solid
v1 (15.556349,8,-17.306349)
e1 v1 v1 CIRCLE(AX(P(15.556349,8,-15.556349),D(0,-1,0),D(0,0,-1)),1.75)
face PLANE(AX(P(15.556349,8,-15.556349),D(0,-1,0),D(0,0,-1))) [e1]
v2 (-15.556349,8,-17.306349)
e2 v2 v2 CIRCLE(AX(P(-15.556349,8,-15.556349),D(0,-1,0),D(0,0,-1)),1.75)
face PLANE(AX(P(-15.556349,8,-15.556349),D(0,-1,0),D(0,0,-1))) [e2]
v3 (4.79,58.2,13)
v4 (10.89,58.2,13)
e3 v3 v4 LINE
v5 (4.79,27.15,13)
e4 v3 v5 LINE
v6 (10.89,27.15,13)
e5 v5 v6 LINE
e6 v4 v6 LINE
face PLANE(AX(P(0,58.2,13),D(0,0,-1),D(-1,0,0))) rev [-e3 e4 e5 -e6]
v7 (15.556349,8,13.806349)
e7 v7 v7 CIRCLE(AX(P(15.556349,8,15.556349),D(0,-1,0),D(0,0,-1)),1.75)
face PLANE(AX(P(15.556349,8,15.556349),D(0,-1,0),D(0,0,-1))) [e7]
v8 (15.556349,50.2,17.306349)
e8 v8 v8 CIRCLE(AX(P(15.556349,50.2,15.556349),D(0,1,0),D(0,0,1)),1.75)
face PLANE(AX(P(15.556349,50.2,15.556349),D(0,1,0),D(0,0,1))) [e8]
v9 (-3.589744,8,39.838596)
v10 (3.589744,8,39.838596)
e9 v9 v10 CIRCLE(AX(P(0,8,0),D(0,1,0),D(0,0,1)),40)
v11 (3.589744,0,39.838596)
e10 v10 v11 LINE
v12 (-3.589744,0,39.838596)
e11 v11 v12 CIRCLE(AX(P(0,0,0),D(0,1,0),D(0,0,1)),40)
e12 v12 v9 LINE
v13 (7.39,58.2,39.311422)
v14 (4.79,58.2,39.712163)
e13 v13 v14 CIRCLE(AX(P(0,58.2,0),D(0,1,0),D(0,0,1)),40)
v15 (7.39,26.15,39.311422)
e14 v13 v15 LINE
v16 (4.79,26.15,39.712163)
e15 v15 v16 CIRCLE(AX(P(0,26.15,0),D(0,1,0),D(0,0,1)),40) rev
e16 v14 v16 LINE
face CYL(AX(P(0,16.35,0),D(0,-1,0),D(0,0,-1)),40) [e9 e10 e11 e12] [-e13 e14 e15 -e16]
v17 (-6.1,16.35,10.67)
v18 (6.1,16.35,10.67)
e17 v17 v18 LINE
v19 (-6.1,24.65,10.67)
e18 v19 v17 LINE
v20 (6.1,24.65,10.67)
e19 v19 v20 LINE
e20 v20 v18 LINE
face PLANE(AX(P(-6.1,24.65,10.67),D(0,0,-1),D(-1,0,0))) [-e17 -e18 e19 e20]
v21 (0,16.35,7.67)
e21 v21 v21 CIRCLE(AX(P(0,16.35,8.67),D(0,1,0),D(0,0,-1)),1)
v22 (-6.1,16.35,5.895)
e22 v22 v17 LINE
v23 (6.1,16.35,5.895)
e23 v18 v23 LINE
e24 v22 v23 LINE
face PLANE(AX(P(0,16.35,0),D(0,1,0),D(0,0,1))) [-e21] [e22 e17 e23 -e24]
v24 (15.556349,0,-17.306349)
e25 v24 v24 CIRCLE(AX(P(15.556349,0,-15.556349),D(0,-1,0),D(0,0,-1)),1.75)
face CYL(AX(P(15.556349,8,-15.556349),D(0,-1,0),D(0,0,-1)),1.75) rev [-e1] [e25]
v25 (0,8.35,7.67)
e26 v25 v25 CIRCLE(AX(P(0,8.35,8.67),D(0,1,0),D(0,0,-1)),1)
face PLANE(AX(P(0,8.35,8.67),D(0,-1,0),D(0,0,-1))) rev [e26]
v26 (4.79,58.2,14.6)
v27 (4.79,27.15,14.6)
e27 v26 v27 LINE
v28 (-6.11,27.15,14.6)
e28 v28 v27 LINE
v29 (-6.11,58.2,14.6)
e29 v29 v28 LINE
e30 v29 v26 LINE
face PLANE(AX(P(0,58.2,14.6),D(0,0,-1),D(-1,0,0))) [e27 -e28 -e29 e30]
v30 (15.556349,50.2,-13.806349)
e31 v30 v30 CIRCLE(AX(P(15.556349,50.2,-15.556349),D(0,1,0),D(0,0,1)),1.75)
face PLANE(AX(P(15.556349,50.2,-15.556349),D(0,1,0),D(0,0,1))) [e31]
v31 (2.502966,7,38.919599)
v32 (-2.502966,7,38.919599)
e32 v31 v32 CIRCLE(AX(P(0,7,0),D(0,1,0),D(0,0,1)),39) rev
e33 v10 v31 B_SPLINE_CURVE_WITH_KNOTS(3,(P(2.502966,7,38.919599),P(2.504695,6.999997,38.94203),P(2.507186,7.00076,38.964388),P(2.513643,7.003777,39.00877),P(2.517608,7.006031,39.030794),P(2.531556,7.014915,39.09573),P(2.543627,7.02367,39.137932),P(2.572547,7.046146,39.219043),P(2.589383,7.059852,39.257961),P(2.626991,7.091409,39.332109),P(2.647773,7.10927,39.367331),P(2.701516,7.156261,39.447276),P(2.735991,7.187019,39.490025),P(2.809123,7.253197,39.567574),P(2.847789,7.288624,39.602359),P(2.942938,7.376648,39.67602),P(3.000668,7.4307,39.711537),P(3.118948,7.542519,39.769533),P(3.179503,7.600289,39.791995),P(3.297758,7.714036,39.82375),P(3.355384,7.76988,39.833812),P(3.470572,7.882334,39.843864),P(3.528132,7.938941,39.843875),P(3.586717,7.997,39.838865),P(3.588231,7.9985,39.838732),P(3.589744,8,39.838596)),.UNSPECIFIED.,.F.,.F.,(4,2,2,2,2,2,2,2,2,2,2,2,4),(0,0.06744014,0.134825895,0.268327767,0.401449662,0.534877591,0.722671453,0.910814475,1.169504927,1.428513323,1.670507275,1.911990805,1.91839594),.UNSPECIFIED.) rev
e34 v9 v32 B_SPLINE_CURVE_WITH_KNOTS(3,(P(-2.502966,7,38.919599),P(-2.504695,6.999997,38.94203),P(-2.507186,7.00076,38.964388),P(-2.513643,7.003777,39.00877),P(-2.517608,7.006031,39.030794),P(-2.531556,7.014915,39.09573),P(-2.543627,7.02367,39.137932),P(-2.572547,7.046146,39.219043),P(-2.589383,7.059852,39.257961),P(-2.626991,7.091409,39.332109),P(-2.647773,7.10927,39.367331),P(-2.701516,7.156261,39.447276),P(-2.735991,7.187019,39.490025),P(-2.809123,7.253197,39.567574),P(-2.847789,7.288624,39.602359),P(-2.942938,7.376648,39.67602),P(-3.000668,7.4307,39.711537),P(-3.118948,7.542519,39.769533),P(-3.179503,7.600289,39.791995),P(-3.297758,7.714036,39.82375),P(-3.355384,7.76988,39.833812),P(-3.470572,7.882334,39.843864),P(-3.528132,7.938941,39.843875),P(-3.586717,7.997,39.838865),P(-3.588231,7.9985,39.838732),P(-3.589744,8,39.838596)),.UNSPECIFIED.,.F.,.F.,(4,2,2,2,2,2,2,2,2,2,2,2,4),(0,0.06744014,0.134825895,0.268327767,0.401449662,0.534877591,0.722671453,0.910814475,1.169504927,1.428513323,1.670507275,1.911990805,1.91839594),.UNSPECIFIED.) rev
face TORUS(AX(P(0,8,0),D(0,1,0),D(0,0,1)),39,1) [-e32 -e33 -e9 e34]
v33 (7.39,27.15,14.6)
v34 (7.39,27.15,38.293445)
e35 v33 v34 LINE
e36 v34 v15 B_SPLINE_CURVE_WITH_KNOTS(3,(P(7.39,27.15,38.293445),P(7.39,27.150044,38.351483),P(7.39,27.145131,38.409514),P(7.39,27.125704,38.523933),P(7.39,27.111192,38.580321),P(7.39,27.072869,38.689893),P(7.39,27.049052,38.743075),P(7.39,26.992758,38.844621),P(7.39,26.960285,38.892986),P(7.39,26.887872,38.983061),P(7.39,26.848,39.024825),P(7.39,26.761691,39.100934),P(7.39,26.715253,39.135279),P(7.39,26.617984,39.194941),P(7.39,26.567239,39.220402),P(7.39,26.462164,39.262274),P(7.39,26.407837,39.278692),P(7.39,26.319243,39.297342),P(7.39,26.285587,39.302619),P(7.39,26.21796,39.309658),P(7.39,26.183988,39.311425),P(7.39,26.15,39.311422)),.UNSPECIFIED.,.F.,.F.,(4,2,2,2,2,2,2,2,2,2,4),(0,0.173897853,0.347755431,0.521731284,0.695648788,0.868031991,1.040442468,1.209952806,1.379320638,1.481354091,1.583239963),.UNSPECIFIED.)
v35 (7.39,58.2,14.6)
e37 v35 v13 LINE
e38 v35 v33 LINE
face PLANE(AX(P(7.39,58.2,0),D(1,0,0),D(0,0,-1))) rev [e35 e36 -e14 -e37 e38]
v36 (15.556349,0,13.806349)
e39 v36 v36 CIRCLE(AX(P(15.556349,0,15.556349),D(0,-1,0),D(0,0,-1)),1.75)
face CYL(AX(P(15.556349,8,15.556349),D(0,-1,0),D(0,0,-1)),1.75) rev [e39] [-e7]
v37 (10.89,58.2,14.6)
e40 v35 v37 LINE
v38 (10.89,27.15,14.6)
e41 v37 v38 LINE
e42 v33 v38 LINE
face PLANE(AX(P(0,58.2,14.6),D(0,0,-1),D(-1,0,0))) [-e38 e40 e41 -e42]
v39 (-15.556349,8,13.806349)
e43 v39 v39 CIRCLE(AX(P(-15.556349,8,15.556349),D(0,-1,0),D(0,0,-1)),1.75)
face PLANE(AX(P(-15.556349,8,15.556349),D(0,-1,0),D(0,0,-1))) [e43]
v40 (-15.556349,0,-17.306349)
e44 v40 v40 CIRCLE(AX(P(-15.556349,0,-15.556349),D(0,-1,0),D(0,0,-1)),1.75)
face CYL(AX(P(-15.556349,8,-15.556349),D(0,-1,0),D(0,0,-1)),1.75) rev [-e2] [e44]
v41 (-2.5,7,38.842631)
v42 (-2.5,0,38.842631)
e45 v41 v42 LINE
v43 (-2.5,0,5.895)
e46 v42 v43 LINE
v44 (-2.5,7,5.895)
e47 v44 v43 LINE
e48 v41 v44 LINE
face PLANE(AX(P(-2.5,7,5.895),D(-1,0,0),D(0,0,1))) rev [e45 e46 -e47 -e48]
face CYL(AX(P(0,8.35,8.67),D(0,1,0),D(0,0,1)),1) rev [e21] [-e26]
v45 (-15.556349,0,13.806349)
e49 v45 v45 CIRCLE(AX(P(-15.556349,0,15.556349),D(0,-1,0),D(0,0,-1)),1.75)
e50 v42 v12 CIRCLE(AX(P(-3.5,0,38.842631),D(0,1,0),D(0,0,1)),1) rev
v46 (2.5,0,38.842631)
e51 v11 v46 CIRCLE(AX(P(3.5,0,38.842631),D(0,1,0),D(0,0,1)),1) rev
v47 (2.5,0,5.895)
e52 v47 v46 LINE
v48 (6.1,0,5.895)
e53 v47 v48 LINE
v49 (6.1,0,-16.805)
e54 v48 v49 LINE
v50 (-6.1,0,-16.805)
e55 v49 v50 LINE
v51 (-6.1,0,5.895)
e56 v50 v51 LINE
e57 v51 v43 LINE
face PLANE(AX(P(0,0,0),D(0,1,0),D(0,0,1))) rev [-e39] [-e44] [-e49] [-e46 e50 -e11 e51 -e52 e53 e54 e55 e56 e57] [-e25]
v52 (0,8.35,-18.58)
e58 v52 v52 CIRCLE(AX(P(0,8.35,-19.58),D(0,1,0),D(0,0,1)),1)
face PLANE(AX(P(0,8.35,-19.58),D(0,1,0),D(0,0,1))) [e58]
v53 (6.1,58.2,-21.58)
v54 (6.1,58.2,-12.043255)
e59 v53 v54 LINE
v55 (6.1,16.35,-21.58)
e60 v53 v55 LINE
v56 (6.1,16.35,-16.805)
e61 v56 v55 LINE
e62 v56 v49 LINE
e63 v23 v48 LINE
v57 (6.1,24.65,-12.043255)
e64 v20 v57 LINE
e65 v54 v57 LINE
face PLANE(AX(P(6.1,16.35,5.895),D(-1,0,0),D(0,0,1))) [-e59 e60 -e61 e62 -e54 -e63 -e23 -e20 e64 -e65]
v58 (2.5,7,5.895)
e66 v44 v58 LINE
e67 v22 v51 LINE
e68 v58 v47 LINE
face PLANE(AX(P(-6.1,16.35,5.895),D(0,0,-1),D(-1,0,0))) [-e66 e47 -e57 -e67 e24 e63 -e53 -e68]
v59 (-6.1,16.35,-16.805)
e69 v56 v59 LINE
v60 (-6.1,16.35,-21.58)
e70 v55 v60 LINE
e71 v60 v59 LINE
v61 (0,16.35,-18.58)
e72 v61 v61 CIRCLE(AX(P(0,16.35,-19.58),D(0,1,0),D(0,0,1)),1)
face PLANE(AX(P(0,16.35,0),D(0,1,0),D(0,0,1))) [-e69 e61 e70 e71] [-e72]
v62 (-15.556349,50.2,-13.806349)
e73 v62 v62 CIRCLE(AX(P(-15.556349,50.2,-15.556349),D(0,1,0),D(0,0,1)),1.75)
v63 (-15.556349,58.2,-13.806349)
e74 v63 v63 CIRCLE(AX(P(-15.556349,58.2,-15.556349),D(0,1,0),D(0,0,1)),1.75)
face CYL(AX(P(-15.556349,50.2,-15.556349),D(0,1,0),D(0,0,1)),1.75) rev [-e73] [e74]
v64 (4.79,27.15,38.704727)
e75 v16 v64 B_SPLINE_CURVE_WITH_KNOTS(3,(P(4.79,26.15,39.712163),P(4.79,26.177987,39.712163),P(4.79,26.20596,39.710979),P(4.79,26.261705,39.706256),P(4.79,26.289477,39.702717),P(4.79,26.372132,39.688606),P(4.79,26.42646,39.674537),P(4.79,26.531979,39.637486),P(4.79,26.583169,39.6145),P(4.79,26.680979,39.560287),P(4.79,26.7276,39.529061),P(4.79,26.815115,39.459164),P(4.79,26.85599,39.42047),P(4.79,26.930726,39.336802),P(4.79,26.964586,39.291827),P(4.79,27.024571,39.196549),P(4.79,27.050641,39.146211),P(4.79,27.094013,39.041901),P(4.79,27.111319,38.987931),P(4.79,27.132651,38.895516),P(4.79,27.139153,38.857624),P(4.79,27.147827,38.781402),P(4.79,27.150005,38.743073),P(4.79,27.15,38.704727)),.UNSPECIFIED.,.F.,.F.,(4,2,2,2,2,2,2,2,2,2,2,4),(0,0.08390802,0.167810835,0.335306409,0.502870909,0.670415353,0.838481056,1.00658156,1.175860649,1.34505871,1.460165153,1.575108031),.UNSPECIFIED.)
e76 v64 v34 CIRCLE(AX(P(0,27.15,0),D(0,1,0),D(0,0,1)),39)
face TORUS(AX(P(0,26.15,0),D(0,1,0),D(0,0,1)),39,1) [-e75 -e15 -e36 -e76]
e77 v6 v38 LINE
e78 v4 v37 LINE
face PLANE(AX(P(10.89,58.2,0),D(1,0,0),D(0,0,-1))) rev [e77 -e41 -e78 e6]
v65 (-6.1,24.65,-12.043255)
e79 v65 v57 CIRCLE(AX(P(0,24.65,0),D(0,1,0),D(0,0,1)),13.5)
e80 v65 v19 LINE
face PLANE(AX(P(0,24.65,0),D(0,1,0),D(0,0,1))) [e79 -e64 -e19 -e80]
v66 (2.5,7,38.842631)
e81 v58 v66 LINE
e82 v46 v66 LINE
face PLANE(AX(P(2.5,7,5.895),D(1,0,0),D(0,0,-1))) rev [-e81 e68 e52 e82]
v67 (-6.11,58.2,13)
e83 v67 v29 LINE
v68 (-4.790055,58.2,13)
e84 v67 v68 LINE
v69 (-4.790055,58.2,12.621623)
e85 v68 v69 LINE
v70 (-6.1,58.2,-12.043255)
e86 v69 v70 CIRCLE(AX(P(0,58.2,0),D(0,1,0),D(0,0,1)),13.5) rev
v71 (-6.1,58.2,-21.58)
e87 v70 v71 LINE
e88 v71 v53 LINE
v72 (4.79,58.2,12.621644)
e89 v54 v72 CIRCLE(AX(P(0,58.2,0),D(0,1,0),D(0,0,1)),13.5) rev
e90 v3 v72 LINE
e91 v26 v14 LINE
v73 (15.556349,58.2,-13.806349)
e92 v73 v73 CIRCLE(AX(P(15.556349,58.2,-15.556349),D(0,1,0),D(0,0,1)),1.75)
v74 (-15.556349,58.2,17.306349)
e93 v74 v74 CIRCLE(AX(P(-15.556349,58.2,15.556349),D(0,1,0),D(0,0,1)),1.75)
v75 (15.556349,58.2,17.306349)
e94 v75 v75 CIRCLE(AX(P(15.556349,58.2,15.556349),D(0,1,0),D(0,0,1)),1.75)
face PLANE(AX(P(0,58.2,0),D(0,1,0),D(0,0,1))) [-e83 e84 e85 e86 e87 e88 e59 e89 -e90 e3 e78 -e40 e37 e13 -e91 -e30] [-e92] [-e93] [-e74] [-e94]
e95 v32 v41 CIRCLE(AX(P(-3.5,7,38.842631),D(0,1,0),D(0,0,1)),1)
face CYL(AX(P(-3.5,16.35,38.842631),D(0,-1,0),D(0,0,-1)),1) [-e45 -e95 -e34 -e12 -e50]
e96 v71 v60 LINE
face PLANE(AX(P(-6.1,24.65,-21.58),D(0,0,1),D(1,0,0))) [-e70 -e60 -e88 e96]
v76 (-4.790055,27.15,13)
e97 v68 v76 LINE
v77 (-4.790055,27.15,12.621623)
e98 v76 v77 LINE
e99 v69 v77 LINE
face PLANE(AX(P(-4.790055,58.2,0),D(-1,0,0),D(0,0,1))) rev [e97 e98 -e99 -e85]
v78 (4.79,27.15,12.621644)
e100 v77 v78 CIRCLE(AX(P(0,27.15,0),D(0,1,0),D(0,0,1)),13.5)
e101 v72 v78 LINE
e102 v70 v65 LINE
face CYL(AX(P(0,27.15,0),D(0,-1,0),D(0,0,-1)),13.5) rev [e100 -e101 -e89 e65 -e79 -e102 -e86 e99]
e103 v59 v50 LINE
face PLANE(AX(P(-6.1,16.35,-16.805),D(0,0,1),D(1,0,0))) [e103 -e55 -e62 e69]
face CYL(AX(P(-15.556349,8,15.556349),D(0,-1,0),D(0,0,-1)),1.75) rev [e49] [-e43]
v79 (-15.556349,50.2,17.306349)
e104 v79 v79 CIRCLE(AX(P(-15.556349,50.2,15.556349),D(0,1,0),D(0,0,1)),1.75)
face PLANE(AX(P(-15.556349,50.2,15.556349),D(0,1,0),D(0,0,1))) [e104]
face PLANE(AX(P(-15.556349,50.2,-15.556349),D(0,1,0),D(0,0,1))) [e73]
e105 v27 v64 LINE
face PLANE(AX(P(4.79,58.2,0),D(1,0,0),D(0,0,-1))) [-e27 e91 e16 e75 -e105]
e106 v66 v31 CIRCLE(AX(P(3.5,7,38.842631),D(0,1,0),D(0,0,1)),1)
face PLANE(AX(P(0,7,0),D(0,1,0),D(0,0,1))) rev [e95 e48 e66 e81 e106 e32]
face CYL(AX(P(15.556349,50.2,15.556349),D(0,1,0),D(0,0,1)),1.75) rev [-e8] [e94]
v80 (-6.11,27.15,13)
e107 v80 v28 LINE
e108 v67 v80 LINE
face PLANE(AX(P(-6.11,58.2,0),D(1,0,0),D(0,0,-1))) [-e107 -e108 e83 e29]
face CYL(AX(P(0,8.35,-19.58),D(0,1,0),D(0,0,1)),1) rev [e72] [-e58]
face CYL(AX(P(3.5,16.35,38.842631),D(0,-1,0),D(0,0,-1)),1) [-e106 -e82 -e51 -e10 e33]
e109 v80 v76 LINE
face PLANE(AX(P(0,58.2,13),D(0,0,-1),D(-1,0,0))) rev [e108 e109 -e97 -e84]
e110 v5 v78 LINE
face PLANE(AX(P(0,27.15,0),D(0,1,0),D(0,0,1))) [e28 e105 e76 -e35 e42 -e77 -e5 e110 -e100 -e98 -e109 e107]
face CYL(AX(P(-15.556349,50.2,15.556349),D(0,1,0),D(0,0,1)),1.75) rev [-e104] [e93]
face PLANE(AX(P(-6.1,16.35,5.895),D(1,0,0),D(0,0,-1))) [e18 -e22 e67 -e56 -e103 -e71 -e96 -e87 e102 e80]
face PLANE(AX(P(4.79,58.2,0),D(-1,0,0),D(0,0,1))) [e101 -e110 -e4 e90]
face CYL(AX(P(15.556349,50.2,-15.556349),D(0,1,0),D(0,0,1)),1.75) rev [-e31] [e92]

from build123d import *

# Parameters (mm, degrees)
SKETCH1_R           = 40
SKETCH1_W           = 12.2
SKETCH1_H           = 22.7
BOSS_EXTRUDE1_DEPTH = 16.35
SKETCH3_W           = 5
SKETCH3_H           = 34.105
CUT_EXTRUDE1_DEPTH  = 7
SKETCH4_R           = 1.75
CUT_EXTRUDE2_DEPTH  = 8
SKETCH2_R           = 40
SKETCH2_W           = 12.2
SKETCH2_H           = 32.25
BOSS_EXTRUDE2_DEPTH = 8.3
SKETCH5_R           = 1
CUT_EXTRUDE3_DEPTH  = 8
SKETCH6_R           = 40
BOSS_EXTRUDE3_DEPTH = 2.5
BOSS_EXTRUDE4_DEPTH = 31.05
CUT_EXTRUDE4_START  = -8
SKETCH8_R           = 1.75
CUT_EXTRUDE4_DEPTH  = 8
FILLET1_R           = 1


with BuildPart() as part:
    # Sketch1 → Boss-Extrude1 (new body)
    with BuildSketch(Plane(origin=(0, 0, 0), x_dir=(1, 0, 0), z_dir=(0, 1, 0))):
        with Locations(Location((0, 0, 0), (0, 0, 270))):
            Circle(SKETCH1_R)
        with Locations((0, 5.455)):
            Rectangle(SKETCH1_W, SKETCH1_H, mode=Mode.SUBTRACT)
    extrude(amount=BOSS_EXTRUDE1_DEPTH)

    # Sketch3 → Cut-Extrude1 (cut)
    with BuildSketch(Plane.XZ):
        with Locations((0, 22.9475)):
            Rectangle(SKETCH3_W, SKETCH3_H)
    extrude(amount=-CUT_EXTRUDE1_DEPTH, mode=Mode.SUBTRACT)

    # Sketch4 → Cut-Extrude2 (cut)
    with BuildSketch(Plane.XZ):
        with Locations(Location((-15.556349186, 15.556349186, 0), (0, 0, 270))):
            Circle(SKETCH4_R)
        with Locations(Location((15.556349186, 15.556349186, 0), (0, 0, 270))):
            Circle(SKETCH4_R)
        with Locations(Location((15.556349186, -15.556349186, 0), (0, 0, 270))):
            Circle(SKETCH4_R)
        with Locations(Location((-15.556349186, -15.556349186, 0), (0, 0, 270))):
            Circle(SKETCH4_R)
    extrude(amount=-CUT_EXTRUDE2_DEPTH, mode=Mode.SUBTRACT)

    # Sketch2 → Boss-Extrude2 (add)
    with BuildSketch(Plane(origin=(0, 16.35, 0), x_dir=(1, 0, 0), z_dir=(0, 1, 0))):
        with Locations(Location((0, 0, 0), (0, 0, 266.416678302))):
            Circle(SKETCH2_R)
        with Locations((0, 5.455)):
            Rectangle(SKETCH2_W, SKETCH2_H, mode=Mode.SUBTRACT)
    extrude(amount=BOSS_EXTRUDE2_DEPTH)

    # Sketch5 → Cut-Extrude3 (cut)
    with BuildSketch(Plane(origin=(0, 16.35, 0), x_dir=(1, 0, 0), z_dir=(0, 1, 0))):
        with Locations(Location((0, 19.58, 0), (0, 0, 270))):
            Circle(SKETCH5_R)
        with Locations(Location((0, -8.67, 0), (0, 0, 90))):
            Circle(SKETCH5_R)
    extrude(amount=-CUT_EXTRUDE3_DEPTH, mode=Mode.SUBTRACT)

    # Sketch6 → Boss-Extrude3 (add)
    with BuildSketch(Plane(origin=(0, 24.65, 0), x_dir=(1, 0, 0), z_dir=(0, 1, 0))):
        with Locations(Location((0, 0, 0), (0, 0, 266.416678302))):
            Circle(SKETCH6_R)
        with BuildLine():
            Line((6.1, 12.043255374), (6.1, 21.58))
            Line((6.1, 21.58), (-6.1, 21.58))
            Line((-6.1, 21.58), (-6.1, 12.043255374))
            ThreePointArc((-6.1, 12.043255374), (0, -13.5), (6.1, 12.043255374))
        make_face(mode=Mode.SUBTRACT)
    extrude(amount=BOSS_EXTRUDE3_DEPTH)

    # Sketch7 → Boss-Extrude4 (add)
    with BuildSketch(Plane(origin=(0, 27.15, 0), x_dir=(1, 0, 0), z_dir=(0, 1, 0))):
        with BuildLine():
            ThreePointArc((-4.790054945, -12.621623256), (-13.48100084, -0.715972321), (-6.1, 12.043255374))
            Line((-6.1, 12.043255374), (-6.1, 21.58))
            Line((-6.1, 21.58), (6.1, 21.58))
            Line((6.1, 21.58), (6.1, 12.043255374))
            ThreePointArc((6.1, 12.043255374), (13.480999281, -0.716001663), (4.79, -12.621644108))
            Line((4.79, -12.621644108), (4.79, -13))
            Line((4.79, -13), (10.89, -13))
            Line((10.89, -13), (10.89, -14.6))
            Line((10.89, -14.6), (7.39, -14.6))
            Line((7.39, -14.6), (7.39, -39.311422004))
            ThreePointArc((7.39, -39.311422004), (30.786360616, -25.538206672), (40, 0))
            ThreePointArc((40, 0), (-29.929918142, 26.536766947), (4.79, -39.712163124))
            Line((4.79, -39.712163124), (4.79, -14.6))
            Line((4.79, -14.6), (-6.11, -14.6))
            Line((-6.11, -14.6), (-6.11, -13))
            Line((-6.11, -13), (-4.790054945, -13))
            Line((-4.790054945, -13), (-4.790054945, -12.621623256))
        make_face()
    extrude(amount=BOSS_EXTRUDE4_DEPTH)

    # Sketch8 → Cut-Extrude4 (cut)
    with BuildSketch(Plane(origin=(0, 58.2, 0), x_dir=(1, 0, 0), z_dir=(0, 1, 0)).offset(CUT_EXTRUDE4_START)):
        with Locations(Location((-15.556349186, 15.556349186, 0), (0, 0, 90))):
            Circle(SKETCH8_R)
        with Locations(Location((15.556349186, 15.556349186, 0), (0, 0, 90))):
            Circle(SKETCH8_R)
        with Locations(Location((15.556349186, -15.556349186, 0), (0, 0, 90))):
            Circle(SKETCH8_R)
        with Locations(Location((-15.556349186, -15.556349186, 0), (0, 0, 90))):
            Circle(SKETCH8_R)
    extrude(amount=CUT_EXTRUDE4_DEPTH, mode=Mode.SUBTRACT)

    # Fillet1
    # the kernel refuses this fillet: 1 mm, written as the material it takes off along each edge
    with BuildSketch(Plane(origin=(-2.5, 7, 39.921798557), x_dir=(-0.9970979844940963, 0, -0.07612889936030137), z_dir=(0, -1, 0))) as fillet1_piece_1:
        with BuildLine():
            CenterArc((1.079253806, 0.999906678), FILLET1_R, 175.633911064, 95.148856173)
            Line((0.082155822, 1.076035578), (0, 0))
            ThreePointArc((0, 0), (0.546457623, -0.003732873), (1.092915247, 0))
        make_face()
    extrude(amount=9.732288117, mode=Mode.SUBTRACT)
    with BuildSketch(Plane(origin=(2.5, 7, 39.921798557), x_dir=(0.9970979844940963, 0, -0.07612889936030175), z_dir=(0, -1, 0))) as fillet1_piece_2:
        with BuildLine():
            CenterArc((1.079253806, -0.999906678), FILLET1_R, 89.217232763, 95.148856173)
            Line((0.082155822, -1.076035578), (0, 0))
            ThreePointArc((0, 0), (0.546457623, 0.003732873), (1.092915247, 0))
        make_face()
    extrude(amount=9.732288117, mode=Mode.SUBTRACT)
    with BuildSketch(Plane(origin=(0, 7, 0), x_dir=(0.12471521651868436, 0, 0.9921925794767352), z_dir=(0.9921925794767352, 0, -0.12471521651868436))) as fillet1_piece_3_section:
        with BuildLine():
            CenterArc((40 - FILLET1_R, -FILLET1_R), FILLET1_R, 0, 90)
            Line((40 - FILLET1_R, 0), (40, 0))
            Line((40, 0), (40, -FILLET1_R))
        make_face()
    fillet1_piece_3 = revolve(axis=Axis((0, 7, 0), (0, -1, 0)), revolution_arc=7.164310198, mode=Mode.PRIVATE)
    fillet1_piece_3 = split(fillet1_piece_3, bisect_by=Plane(origin=(2.5, 7.226394193, 39.747383267), z_dir=(-1, 0, 0)), keep=Keep.TOP, mode=Mode.PRIVATE)
    add(fillet1_piece_3, mode=Mode.SUBTRACT)
    with BuildSketch(Plane(origin=(0, 27.15, 0), x_dir=(0.057506279993827, 0, 0.9983451446074506), z_dir=(-0.9983451446074506, 0, 0.057506279993827))) as fillet1_piece_4_section:
        with BuildLine():
            CenterArc((40 - FILLET1_R, -FILLET1_R), FILLET1_R, 0, 90)
            Line((40 - FILLET1_R, 0), (40, 0))
            Line((40, 0), (40, -FILLET1_R))
        make_face()
    fillet1_piece_4 = revolve(axis=Axis((0, 27.15, 0), (0, 1, 0)), revolution_arc=10.930860095, mode=Mode.PRIVATE)
    fillet1_piece_4 = split(fillet1_piece_4, bisect_by=Plane(origin=(4.79, 26.923621973, 39.296870163), z_dir=(1, 0, 0)), keep=Keep.TOP, mode=Mode.PRIVATE)
    fillet1_piece_4 = split(fillet1_piece_4, bisect_by=Plane(origin=(7.39, 26.923621973, 39.296870163), z_dir=(-1, 0, 0)), keep=Keep.TOP, mode=Mode.PRIVATE)
    add(fillet1_piece_4, mode=Mode.SUBTRACT)
    with BuildSketch(Plane(origin=(0, 7, 0), x_dir=(0, 0, 1), z_dir=(1, 0, 0))) as fillet1_piece_5_section:
        with BuildLine():
            CenterArc((40 - FILLET1_R, -FILLET1_R), FILLET1_R, 0, 90)
            Line((40 - FILLET1_R, 0), (40, 0))
            Line((40, 0), (40, -FILLET1_R))
        make_face()
    fillet1_piece_5 = revolve(axis=Axis((0, 7, 0), (0, -1, 0)), revolution_arc=7.164310198, mode=Mode.PRIVATE)
    fillet1_piece_5 = split(fillet1_piece_5, bisect_by=Plane(origin=(-2.5, 7.226394086, 39.74738287), z_dir=(1, 0, 0)), keep=Keep.TOP, mode=Mode.PRIVATE)
    add(fillet1_piece_5, mode=Mode.SUBTRACT)
    with BuildSketch(Plane(origin=(0, 7, 0), x_dir=(0, 0, 1), z_dir=(1, 0, 0))) as fillet1_piece_6a_section:
        with BuildLine():
            CenterArc((40 - FILLET1_R, -FILLET1_R), FILLET1_R, 0, 90)
            Line((40 - FILLET1_R, 0), (40, 0))
            Line((40, 0), (40, -FILLET1_R))
        make_face()
    fillet1_piece_6a = revolve(axis=Axis((0, 7, 0), (0, -1, 0)), revolution_arc=7.164310198, mode=Mode.PRIVATE)
    fillet1_piece_6a = split(fillet1_piece_6a, bisect_by=Plane(origin=(-2.5, 7.227785013, 39.594106119), z_dir=(-1, 0, 0)), keep=Keep.TOP, mode=Mode.PRIVATE)
    with BuildSketch(Plane(origin=(-2.5, 9.732288117, 39.921798557), x_dir=(-0.9970979844940969, 0, -0.07612889936029517), z_dir=(0, -1, 0))) as fillet1_piece_6b_section:
        with BuildLine():
            CenterArc((1.079253806, 0.999906678), FILLET1_R, 175.633911064, 95.148856173)
            Line((0.082155822, 1.076035578), (0, 0))
            ThreePointArc((0, 0), (0.546457623, -0.003732873), (1.092915247, 0))
        make_face()
    fillet1_piece_6b = extrude(amount=12.464576234, mode=Mode.PRIVATE)
    fillet1_piece_6b = split(fillet1_piece_6b, bisect_by=Plane(origin=(-2.749431224, 7, 39.658633208), z_dir=(0, 1, 0)), keep=Keep.TOP, mode=Mode.PRIVATE)
    fillet1_piece_6 = fillet1_piece_6a & fillet1_piece_6b
    add(fillet1_piece_6, mode=Mode.SUBTRACT)
    with BuildSketch(Plane(origin=(2.5, 9.732288117, 39.921798557), x_dir=(0.9970979844940969, 0, -0.07612889936029532), z_dir=(0, -1, 0))) as fillet1_piece_7a_section:
        with BuildLine():
            CenterArc((1.079253806, -0.999906678), FILLET1_R, 89.217232763, 95.148856173)
            Line((0.082155822, -1.076035578), (0, 0))
            ThreePointArc((0, 0), (0.546457623, 0.003732873), (1.092915247, 0))
        make_face()
    fillet1_piece_7a = extrude(amount=12.464576234, mode=Mode.PRIVATE)
    fillet1_piece_7a = split(fillet1_piece_7a, bisect_by=Plane(origin=(2.749431224, 7, 39.658633208), z_dir=(0, 1, 0)), keep=Keep.TOP, mode=Mode.PRIVATE)
    with BuildSketch(Plane(origin=(0, 7, 0), x_dir=(0.12471521651868436, 0, 0.9921925794767352), z_dir=(0.9921925794767352, 0, -0.12471521651868436))) as fillet1_piece_7b_section:
        with BuildLine():
            CenterArc((40 - FILLET1_R, -FILLET1_R), FILLET1_R, 0, 90)
            Line((40 - FILLET1_R, 0), (40, 0))
            Line((40, 0), (40, -FILLET1_R))
        make_face()
    fillet1_piece_7b = revolve(axis=Axis((0, 7, 0), (0, -1, 0)), revolution_arc=7.164310198, mode=Mode.PRIVATE)
    fillet1_piece_7b = split(fillet1_piece_7b, bisect_by=Plane(origin=(2.5, 7.227784999, 39.594105903), z_dir=(1, 0, 0)), keep=Keep.TOP, mode=Mode.PRIVATE)
    fillet1_piece_7 = fillet1_piece_7a & fillet1_piece_7b
    add(fillet1_piece_7, mode=Mode.SUBTRACT)


solid = part.part
